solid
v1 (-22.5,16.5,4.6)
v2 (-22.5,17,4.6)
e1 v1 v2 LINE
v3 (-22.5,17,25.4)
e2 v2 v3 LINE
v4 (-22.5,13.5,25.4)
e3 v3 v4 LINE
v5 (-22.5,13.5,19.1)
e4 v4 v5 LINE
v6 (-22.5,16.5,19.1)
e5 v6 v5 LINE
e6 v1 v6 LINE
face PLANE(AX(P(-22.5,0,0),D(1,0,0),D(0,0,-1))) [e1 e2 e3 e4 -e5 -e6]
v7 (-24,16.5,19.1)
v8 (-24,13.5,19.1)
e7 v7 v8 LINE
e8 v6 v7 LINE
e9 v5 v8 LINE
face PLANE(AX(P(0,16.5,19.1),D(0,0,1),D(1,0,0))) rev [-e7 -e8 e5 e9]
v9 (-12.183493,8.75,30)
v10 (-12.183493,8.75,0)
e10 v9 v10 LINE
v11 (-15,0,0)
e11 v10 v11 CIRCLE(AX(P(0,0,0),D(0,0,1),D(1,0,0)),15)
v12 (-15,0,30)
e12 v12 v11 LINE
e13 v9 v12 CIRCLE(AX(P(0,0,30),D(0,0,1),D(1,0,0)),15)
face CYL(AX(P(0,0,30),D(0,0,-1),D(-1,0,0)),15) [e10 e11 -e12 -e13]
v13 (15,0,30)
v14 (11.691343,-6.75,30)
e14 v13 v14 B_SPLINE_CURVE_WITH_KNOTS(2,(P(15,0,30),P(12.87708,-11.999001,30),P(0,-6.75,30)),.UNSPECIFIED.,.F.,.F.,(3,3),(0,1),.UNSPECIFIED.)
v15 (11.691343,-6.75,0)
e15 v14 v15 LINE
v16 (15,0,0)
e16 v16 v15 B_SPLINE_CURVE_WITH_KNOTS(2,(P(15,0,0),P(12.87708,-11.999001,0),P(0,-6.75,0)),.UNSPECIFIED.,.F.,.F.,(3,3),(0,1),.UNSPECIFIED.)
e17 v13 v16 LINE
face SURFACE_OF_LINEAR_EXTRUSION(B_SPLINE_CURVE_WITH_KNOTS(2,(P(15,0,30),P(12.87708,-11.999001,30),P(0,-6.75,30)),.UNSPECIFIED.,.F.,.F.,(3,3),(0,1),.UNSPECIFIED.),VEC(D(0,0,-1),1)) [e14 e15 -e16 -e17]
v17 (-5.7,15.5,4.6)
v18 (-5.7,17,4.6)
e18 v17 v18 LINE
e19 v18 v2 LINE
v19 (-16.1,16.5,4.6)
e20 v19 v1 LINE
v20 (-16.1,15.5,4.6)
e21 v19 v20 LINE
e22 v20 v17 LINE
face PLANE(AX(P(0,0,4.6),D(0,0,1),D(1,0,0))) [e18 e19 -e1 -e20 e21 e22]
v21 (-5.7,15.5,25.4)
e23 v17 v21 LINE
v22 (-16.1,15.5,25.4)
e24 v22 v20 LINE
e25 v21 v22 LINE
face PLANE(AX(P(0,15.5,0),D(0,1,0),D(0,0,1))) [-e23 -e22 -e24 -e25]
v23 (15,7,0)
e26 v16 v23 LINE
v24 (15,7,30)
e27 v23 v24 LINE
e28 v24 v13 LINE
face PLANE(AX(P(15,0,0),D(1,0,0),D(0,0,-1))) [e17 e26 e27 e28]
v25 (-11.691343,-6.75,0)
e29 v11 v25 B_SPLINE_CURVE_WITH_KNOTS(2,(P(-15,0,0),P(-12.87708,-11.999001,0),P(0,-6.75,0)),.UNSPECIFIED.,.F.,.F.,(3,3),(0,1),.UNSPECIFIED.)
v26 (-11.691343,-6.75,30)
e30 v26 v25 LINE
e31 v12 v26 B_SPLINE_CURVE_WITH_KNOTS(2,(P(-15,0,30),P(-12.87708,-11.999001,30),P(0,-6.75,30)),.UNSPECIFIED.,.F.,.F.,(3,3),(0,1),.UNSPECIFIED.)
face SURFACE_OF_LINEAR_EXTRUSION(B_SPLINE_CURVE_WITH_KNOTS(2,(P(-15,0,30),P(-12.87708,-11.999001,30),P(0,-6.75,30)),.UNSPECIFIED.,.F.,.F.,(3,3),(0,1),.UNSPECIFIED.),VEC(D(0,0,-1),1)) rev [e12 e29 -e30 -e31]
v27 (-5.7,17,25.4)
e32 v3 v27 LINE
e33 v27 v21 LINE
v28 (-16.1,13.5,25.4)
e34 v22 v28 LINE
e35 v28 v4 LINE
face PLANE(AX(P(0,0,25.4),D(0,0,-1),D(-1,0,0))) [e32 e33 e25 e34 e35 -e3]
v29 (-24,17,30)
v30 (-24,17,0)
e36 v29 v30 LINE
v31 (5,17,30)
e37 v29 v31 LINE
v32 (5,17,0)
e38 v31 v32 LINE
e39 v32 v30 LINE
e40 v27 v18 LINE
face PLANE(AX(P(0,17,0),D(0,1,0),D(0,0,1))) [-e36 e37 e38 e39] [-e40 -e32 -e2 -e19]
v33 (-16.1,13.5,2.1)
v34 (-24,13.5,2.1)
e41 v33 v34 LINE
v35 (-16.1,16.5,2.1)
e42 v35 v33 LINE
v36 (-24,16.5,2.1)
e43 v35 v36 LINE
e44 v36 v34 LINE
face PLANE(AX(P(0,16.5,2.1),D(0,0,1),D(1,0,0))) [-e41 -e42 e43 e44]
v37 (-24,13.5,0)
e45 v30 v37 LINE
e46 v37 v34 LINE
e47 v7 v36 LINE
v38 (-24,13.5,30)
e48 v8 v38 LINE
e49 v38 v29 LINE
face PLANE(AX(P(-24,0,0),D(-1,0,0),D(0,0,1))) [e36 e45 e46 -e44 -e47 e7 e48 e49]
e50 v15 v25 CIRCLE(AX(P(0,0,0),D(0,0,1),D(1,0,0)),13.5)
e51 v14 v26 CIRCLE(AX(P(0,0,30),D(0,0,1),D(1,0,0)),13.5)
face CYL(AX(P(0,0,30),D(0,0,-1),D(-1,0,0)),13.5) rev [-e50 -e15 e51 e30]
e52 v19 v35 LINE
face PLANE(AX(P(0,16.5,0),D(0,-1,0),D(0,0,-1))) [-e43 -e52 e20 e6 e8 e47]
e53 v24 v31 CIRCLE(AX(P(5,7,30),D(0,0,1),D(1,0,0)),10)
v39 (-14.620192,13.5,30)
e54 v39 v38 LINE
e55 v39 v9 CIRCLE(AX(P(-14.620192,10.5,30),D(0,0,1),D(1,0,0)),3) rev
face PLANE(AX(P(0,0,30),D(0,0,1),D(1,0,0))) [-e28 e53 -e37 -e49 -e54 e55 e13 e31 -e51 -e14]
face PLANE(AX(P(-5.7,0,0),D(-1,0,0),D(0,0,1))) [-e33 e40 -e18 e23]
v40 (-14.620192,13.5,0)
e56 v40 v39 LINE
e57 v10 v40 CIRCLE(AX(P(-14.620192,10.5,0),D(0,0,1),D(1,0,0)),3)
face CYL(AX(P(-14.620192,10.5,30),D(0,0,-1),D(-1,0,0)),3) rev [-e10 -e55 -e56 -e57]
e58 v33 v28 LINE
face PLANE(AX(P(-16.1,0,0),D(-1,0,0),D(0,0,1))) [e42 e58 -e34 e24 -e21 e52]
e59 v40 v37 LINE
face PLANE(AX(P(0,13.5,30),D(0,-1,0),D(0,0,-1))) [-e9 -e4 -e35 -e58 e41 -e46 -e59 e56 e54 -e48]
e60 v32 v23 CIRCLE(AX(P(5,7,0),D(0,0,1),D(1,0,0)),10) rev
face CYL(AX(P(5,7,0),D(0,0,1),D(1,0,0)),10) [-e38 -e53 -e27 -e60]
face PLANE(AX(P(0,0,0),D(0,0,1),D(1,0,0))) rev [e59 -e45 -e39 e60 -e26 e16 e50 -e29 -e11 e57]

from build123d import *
from build123d.topology import SkipClean

# Parameters (mm, degrees)
SKETCH_2_W           = 5
SKETCH_2_H           = 5
EXTRUDE_3_DEPTH      = 30
CUT_EXTRUDE_10_DEPTH = 3
SKETCH_10_W          = 25.587445544
SKETCH_10_H          = 30
CUT_EXTRUDE_11_DEPTH = 1.5
SKETCH_11_W          = 16.6
SKETCH_11_H          = 21.6
SKETCH_11_W_2        = 16
SKETCH_11_H_2        = 21
CUT_EXTRUDE_13_DEPTH = 1.5
SKETCH_12_W          = 3.2
SKETCH_12_H          = 21.6
CUT_EXTRUDE_14_DEPTH = 2
FILLET_7_R           = 7
FILLET_8_R           = 3
SKETCH_13_W          = 4.016092165
SKETCH_13_H          = 18.031984282
CUT_EXTRUDE_15_DEPTH = 1.5
EXTRUDE_4_DEPTH      = 1.5
SKETCH_15_W          = 10
SKETCH_15_H          = 30
EXTRUDE_6_DEPTH      = 8
SKETCH_17_R          = 13.5
CUT_EXTRUDE_16_DEPTH = 40.862263024
SKETCH_19_W          = 16.6
SKETCH_19_H          = 0.2
EXTRUDE_7_DEPTH      = 3.5
SKETCH_20_W          = 30
SKETCH_20_H          = 17
EXTRUDE_8_DEPTH      = 5.211662
FILLET_18_R          = 10
SKETCH_21_R          = 13.5
CUT_EXTRUDE_17_DEPTH = 40.862263024
SKETCH_22_W          = 30
SKETCH_22_H          = 3.5
EXTRUDE_9_DEPTH      = 4
SKETCH_23_W          = 21.2
SKETCH_23_H          = 3.5
CUT_EXTRUDE_18_DEPTH = 4
EXTRUDE_START        = -3
SKETCH_24_R          = 1.1
EXTRUDE_10_DEPTH     = 3
SKETCH_25_W          = 21.2
SKETCH_25_H          = 1.5
EXTRUDE_11_DEPTH     = 4
SKETCH_27_W          = 16.6
SKETCH_27_H          = 3.5
EXTRUDE_12_DEPTH     = 0.5
SKETCH_28_W          = 16.6
SKETCH_28_H          = 3.5
EXTRUDE_13_DEPTH     = 0.5
SKETCH_29_W          = 20.2
SKETCH_29_H          = 2
EXTRUDE_14_DEPTH     = 1
CUT_EXTRUDE_19_DEPTH = 0.3
CUT_EXTRUDE_20_DEPTH = 0.3
SKETCH_32_W          = 20.8
SKETCH_32_H          = 3.5
CUT_EXTRUDE_21_DEPTH = 0.2
SKETCH_33_W          = 10.4
SKETCH_33_H          = 20.8
CUT_EXTRUDE_22_DEPTH = 1.5
SKETCH_34_W          = 0.328912479
SKETCH_34_H          = 2.5
SKETCH_34_W_2        = 6.071087521
CUT_EXTRUDE_24_DEPTH = 3


with BuildPart() as part:
    # 스케치2 → 보스-돌출3 (new body)
    with BuildSketch(Plane.XY):
        with Locations((-17.5, 16)):
            Rectangle(SKETCH_2_W, SKETCH_2_H)
        with BuildLine():
            Line((-6.659230275, 13.5), (-6.538348415, 13.5))
            ThreePointArc((-6.538348415, 13.5), (-3.354101966, 14.620191517), (0, 15))
            Line((0, 15), (0, 18.5))
            Line((0, 18.5), (-15, 18.5))
            Line((-15, 18.5), (-15, 13.5))
            Line((-15, 13.5), (-6.659230275, 13.5))
        make_face()
        with BuildLine():
            Line((0, 18.5), (0, 15))
            ThreePointArc((0, 15), (2.845384759, 14.72765377), (5.587445544, 13.920504743))
            Line((5.587445544, 13.920504743), (5.587445544, 18.5))
            Line((5.587445544, 18.5), (0, 18.5))
        make_face()
        with BuildLine():
            Line((0, 15), (0, 13.5))
            Line((0, 13.5), (5.587445544, 13.5))
            Line((5.587445544, 13.5), (5.587445544, 13.920504743))
            ThreePointArc((5.587445544, 13.920504743), (2.845384759, 14.72765377), (0, 15))
        make_face()
        with BuildLine():
            Line((-6.538348415, 13.5), (0, 13.5))
            Line((0, 13.5), (0, 15))
            ThreePointArc((0, 15), (-3.354101966, 14.620191517), (-6.538348415, 13.5))
        make_face()
        with BuildLine():
            ThreePointArc((-11.691342951, -6.75), (-11.691342951, 6.75), (0, 13.5))
            Line((0, 13.5), (-6.538348415, 13.5))
            ThreePointArc((-6.538348415, 13.5), (-12.709744809, 7.966328319), (-15, 0))
            add(Edge.make_bspline(
                [(-15, 0), (-14.169195888, -4.6958052), (-11.691342951, -6.75)],
                knots=[0, 0, 0, 0.391349689, 0.391349689, 0.391349689], degree=2))
        make_face()
        with BuildLine():
            Line((5.587445544, 13.920504743), (5.587445544, 13.5))
            Line((5.587445544, 13.5), (6.538348415, 13.5))
            ThreePointArc((6.538348415, 13.5), (6.066541506, 13.718493873), (5.587445544, 13.920504743))
        make_face()
        with BuildLine():
            Line((5.587445544, 13.5), (0, 13.5))
            ThreePointArc((0, 13.5), (9.545941546, 9.545941546), (13.5, 0))
            ThreePointArc((13.5, 0), (13.039998655, -3.494057109), (11.691342951, -6.75))
            add(Edge.make_bspline(
                [(15, 0), (14.169195888, -4.6958052), (11.691342951, -6.75)],
                knots=[0, 0, 0, 0.391349689, 0.391349689, 0.391349689], degree=2))
            ThreePointArc((15, 0), (12.709744809, 7.966328319), (6.538348415, 13.5))
            Line((6.538348415, 13.5), (5.587445544, 13.5))
        make_face()
    extrude(amount=EXTRUDE_3_DEPTH)

    # 스케치3 → 컷-돌출10 (cut)
    with BuildSketch(Plane(origin=(0, 18.5, 0), x_dir=(1, 0, 0), z_dir=(0, 1, 0))):
        with BuildLine():
            Line((-18, -4.5), (-18, -15))
            Line((-18, -15), (-18, -25.5))
            Line((-18, -25.5), (-5.67, -25.5))
            Line((-5.67, -25.5), (-5.67, -23.546313431))
            ThreePointArc((-5.67, -23.546313431), (-6.553883476, -21.412429955), (-4.42, -22.296313431))
            Line((-4.42, -22.296313431), (-2, -22.296313431))
            Line((-2, -22.296313431), (-2, -7.5))
            Line((-2, -7.5), (-4.42, -7.5))
            ThreePointArc((-4.42, -7.5), (-6.553883476, -8.383883476), (-5.67, -6.25))
            Line((-5.67, -6.25), (-5.67, -4.5))
            Line((-5.67, -4.5), (-18, -4.5))
        make_face()
        with BuildLine():
            Line((-2, -4.5), (-5.67, -4.5))
            Line((-5.67, -4.5), (-5.67, -6.25))
            ThreePointArc((-5.67, -6.25), (-4.786116524, -6.616116524), (-4.42, -7.5))
            Line((-4.42, -7.5), (-2, -7.5))
            Line((-2, -7.5), (-2, -4.5))
        make_face()
        with BuildLine():
            Line((-5.67, -23.546313431), (-5.67, -25.5))
            Line((-5.67, -25.5), (-2, -25.5))
            Line((-2, -25.5), (-2, -22.296313431))
            Line((-2, -22.296313431), (-4.42, -22.296313431))
            ThreePointArc((-4.42, -22.296313431), (-4.786116524, -23.180196907), (-5.67, -23.546313431))
        make_face()
    extrude(amount=-CUT_EXTRUDE_10_DEPTH, mode=Mode.SUBTRACT)

    # 스케치10 → 컷-돌출11 (cut)
    with BuildSketch(Plane(origin=(0, 18.5, 0), x_dir=(1, 0, 0), z_dir=(0, 1, 0))):
        with Locations((-7.206277228, -15)):
            Rectangle(SKETCH_10_W, SKETCH_10_H)
    extrude(amount=-CUT_EXTRUDE_11_DEPTH, mode=Mode.SUBTRACT)

    # 스케치11 → 컷-돌출13 (cut)
    with BuildSketch(Plane(origin=(0, 17, 0), x_dir=(1, 0, 0), z_dir=(0, 1, 0))):
        with Locations((-10, -15)):
            Rectangle(SKETCH_11_W, SKETCH_11_H)
        with Locations((-10, -15)):
            Rectangle(SKETCH_11_W_2, SKETCH_11_H_2, mode=Mode.SUBTRACT)
    extrude(amount=-CUT_EXTRUDE_13_DEPTH, mode=Mode.SUBTRACT)

    # 스케치12 → 컷-돌출14 (cut)
    with BuildSketch(Plane(origin=(0, 15.5, 0), x_dir=(1, 0, 0), z_dir=(0, 1, 0))):
        with Locations((-16.7, -15)):
            Rectangle(SKETCH_12_W, SKETCH_12_H)
    extrude(amount=-CUT_EXTRUDE_14_DEPTH, mode=Mode.SUBTRACT)

    # 필렛7
    # the kernel refuses this fillet: 7 mm, written as the material it takes off along each edge
    with BuildSketch(Plane(origin=(5.587445544, 17, -14.497767621), x_dir=(-1, 0, 0), z_dir=(0, 0, 1))) as fillet_7_piece_1:
        with BuildLine():
            CenterArc((5.799107049, 7), FILLET_7_R, 214.060784508, 55.939215492)
            Line((0, 3.079495257), (-0.115982141, 3.001085162))
            ThreePointArc((-0.115982141, 3.001085162), (-0.14, 1.539747629), (-0.14, 0))
            Line((-0.14, 0), (0, -0.14))
            Line((0, -0.14), (5.799107049, -0.14))
            Line((5.799107049, -0.14), (5.799107049, 0))
        make_face()
    extrude(amount=58.995535243, mode=Mode.SUBTRACT)

    # 필렛8
    fillet_8_edges = [part.edges().sort_by_distance(p)[0] for p in [
        (-6.538348415, 13.5, 15),
    ]]
    fillet(fillet_8_edges, radius=FILLET_8_R)

    # 스케치13 → 컷-돌출15 (cut)
    with BuildSketch(Plane(origin=(0, 17, 0), x_dir=(1, 0, 0), z_dir=(0, 1, 0))):
        with Locations((-5.720959824, -14.919139084)):
            Rectangle(SKETCH_13_W, SKETCH_13_H)
    extrude(amount=-CUT_EXTRUDE_15_DEPTH, mode=Mode.SUBTRACT)

    # 스케치14 → 보스-돌출4 (add)
    with BuildSketch(Plane(origin=(0, 15.5, 0), x_dir=(1, 0, 0), z_dir=(0, 1, 0))):
        with BuildLine():
            ThreePointArc((-3.1, -7.2), (-3.422182541, -6.422182541), (-4.2, -6.1))
            Line((-4.2, -6.1), (-4.2, -7.2))
            Line((-4.2, -7.2), (-3.1, -7.2))
        make_face()
        with BuildLine():
            Line((-4.2, -7.2), (-4.2, -6.1))
            ThreePointArc((-4.2, -6.1), (-4.977817459, -7.977817459), (-3.1, -7.2))
            Line((-3.1, -7.2), (-4.2, -7.2))
        make_face()
        with BuildLine():
            ThreePointArc((-3.1, -22.8), (-4.977817459, -22.022182541), (-4.2, -23.9))
            Line((-4.2, -23.9), (-4.2, -22.8))
            Line((-4.2, -22.8), (-3.1, -22.8))
        make_face()
        with BuildLine():
            Line((-4.2, -22.8), (-4.2, -23.9))
            ThreePointArc((-4.2, -23.9), (-3.422182541, -23.577817459), (-3.1, -22.8))
            Line((-3.1, -22.8), (-4.2, -22.8))
        make_face()
    extrude(amount=EXTRUDE_4_DEPTH)

    # 스케치15 → 보스-돌출6 (add)
    with BuildSketch(Plane(origin=(0, 17, 0), x_dir=(1, 0, 0), z_dir=(0, 1, 0))):
        with Locations((4.788338495, -15)):
            Rectangle(SKETCH_15_W, SKETCH_15_H)
    extrude(amount=-EXTRUDE_6_DEPTH)

    # 스케치17 → 컷-돌출16 (cut, through all)
    with BuildSketch(Plane(origin=(0, 0, 0), x_dir=(-1, 0, 0), z_dir=(0, 0, -1))):
        Circle(SKETCH_17_R)
    extrude(amount=-CUT_EXTRUDE_16_DEPTH, mode=Mode.SUBTRACT)

    # 스케치19 → 보스-돌출7 (add)
    with BuildSketch(Plane(origin=(0, 17, 0), x_dir=(1, 0, 0), z_dir=(0, 1, 0))):
        with Locations((-10, -4.3)):
            Rectangle(SKETCH_19_W, SKETCH_19_H)
        with Locations((-10, -25.7)):
            Rectangle(SKETCH_19_W, SKETCH_19_H)
    extrude(amount=-EXTRUDE_7_DEPTH)

    # 스케치20 → 보스-돌출8 (add)
    with BuildSketch(Plane(origin=(9.788338495, 0, 0), x_dir=(0, 0, -1), z_dir=(1, 0, 0))):
        with Locations((-15, 8.5)):
            Rectangle(SKETCH_20_W, SKETCH_20_H)
    extrude(amount=EXTRUDE_8_DEPTH)

    # 필렛18
    fillet_18_edges = [part.edges().sort_by_distance(p)[0] for p in [
        (15.000000495, 17, 15),
    ]]
    fillet(fillet_18_edges, radius=FILLET_18_R)

    # 스케치21 → 컷-돌출17 (cut, through all)
    with SkipClean():  # the faces are left unmerged after this step: merging them gives an invalid solid
        with BuildSketch(Plane.XY.offset(30)):
            Circle(SKETCH_21_R)
        extrude(amount=-CUT_EXTRUDE_17_DEPTH, mode=Mode.SUBTRACT)

    # 스케치22 → 보스-돌출9 (add)
    with SkipClean():  # the faces are left unmerged after this step: merging them gives an invalid solid
        with BuildSketch(Plane.ZY.offset(20)):
            with Locations((15, 15.25)):
                Rectangle(SKETCH_22_W, SKETCH_22_H)
        extrude(amount=EXTRUDE_9_DEPTH)

    # 스케치23 → 컷-돌출18 (cut)
    with SkipClean():  # the faces are left unmerged after this step: merging them gives an invalid solid
        with BuildSketch(Plane(origin=(-18.3, 0, 0), x_dir=(0, 0, -1), z_dir=(1, 0, 0))):
            with Locations((-15, 15.25)):
                Rectangle(SKETCH_23_W, SKETCH_23_H)
        extrude(amount=-CUT_EXTRUDE_18_DEPTH, mode=Mode.SUBTRACT)

    # 스케치24 → 보스-돌출10 (add)
    with SkipClean():  # the faces are left unmerged after this step: merging them gives an invalid solid
        with BuildSketch(Plane(origin=(0, 17, 0), x_dir=(1, 0, 0), z_dir=(0, 1, 0)).offset(EXTRUDE_START)):
            with Locations(Location((-4.2, -7.2, 0), (0, 0, 270))):
                Circle(SKETCH_24_R)
            with Locations(Location((-8.2, -7.2, 0), (0, 0, 270))):
                Circle(SKETCH_24_R)
            with Locations(Location((-8.2, -22.8, 0), (0, 0, 270))):
                Circle(SKETCH_24_R)
        extrude(amount=EXTRUDE_10_DEPTH)

    # 스케치25 → 보스-돌출11 (add)
    with SkipClean():  # the faces are left unmerged after this step: merging them gives an invalid solid
        with BuildSketch(Plane.ZY.offset(1.7)):
            with Locations((15, 16.25)):
                Rectangle(SKETCH_25_W, SKETCH_25_H)
        extrude(amount=EXTRUDE_11_DEPTH)

    # 스케치27 → 보스-돌출12 (add)
    with SkipClean():  # the faces are left unmerged after this step: merging them gives an invalid solid
        with BuildSketch(Plane.XY.offset(4.4)):
            with Locations((-14, 15.25)):
                Rectangle(SKETCH_27_W, SKETCH_27_H)
        extrude(amount=EXTRUDE_12_DEPTH)

    # 스케치28 → 보스-돌출13 (add)
    with SkipClean():  # the faces are left unmerged after this step: merging them gives an invalid solid
        with BuildSketch(Plane(origin=(0, 0, 25.6), x_dir=(-1, 0, 0), z_dir=(0, 0, -1))):
            with Locations((14, 15.25)):
                Rectangle(SKETCH_28_W, SKETCH_28_H)
        extrude(amount=EXTRUDE_13_DEPTH)

    # 스케치29 → 보스-돌출14 (add)
    with SkipClean():  # the faces are left unmerged after this step: merging them gives an invalid solid
        with BuildSketch(Plane.ZY.offset(15.1)):
            with Locations((15, 14.5)):
                Rectangle(SKETCH_29_W, SKETCH_29_H)
        extrude(amount=EXTRUDE_14_DEPTH)

    # 스케치30 → 컷-돌출19 (cut)
    with SkipClean():  # the faces are left unmerged after this step: merging them gives an invalid solid
        with BuildSketch(Plane(origin=(0, 0, 25.1), x_dir=(-1, 0, 0), z_dir=(0, 0, -1))):
            Polygon((5.7, 15.5), (16.1, 15.5), (16.1, 13.5), (22.3, 13.5), (22.3, 17), (5.7, 17), align=None)
        extrude(amount=-CUT_EXTRUDE_19_DEPTH, mode=Mode.SUBTRACT)

    # 스케치31 → 컷-돌출20 (cut)
    with SkipClean():  # the faces are left unmerged after this step: merging them gives an invalid solid
        with BuildSketch(Plane.XY.offset(4.9)):
            Polygon((-16.1, 13.5), (-16.1, 15.5), (-5.7, 15.5), (-5.7, 17), (-22.3, 17), (-22.3, 13.5), align=None)
        extrude(amount=-CUT_EXTRUDE_20_DEPTH, mode=Mode.SUBTRACT)

    # 스케치32 → 컷-돌출21 (cut)
    with SkipClean():  # the faces are left unmerged after this step: merging them gives an invalid solid
        with BuildSketch(Plane(origin=(-22.3, 0, 0), x_dir=(0, 0, -1), z_dir=(1, 0, 0))):
            with Locations((-15, 15.25)):
                Rectangle(SKETCH_32_W, SKETCH_32_H)
        extrude(amount=-CUT_EXTRUDE_21_DEPTH, mode=Mode.SUBTRACT)

    # 스케치33 → 컷-돌출22 (cut)
    with SkipClean():  # the faces are left unmerged after this step: merging them gives an invalid solid
        with BuildSketch(Plane(origin=(0, 17, 0), x_dir=(1, 0, 0), z_dir=(0, 1, 0))):
            with Locations((-10.9, -15)):
                Rectangle(SKETCH_33_W, SKETCH_33_H)
        extrude(amount=-CUT_EXTRUDE_22_DEPTH, mode=Mode.SUBTRACT)

    # 스케치34 → 컷-돌출24 (cut)
    with SkipClean():  # the faces are left unmerged after this step: merging them gives an invalid solid
        with BuildSketch(Plane.XZ.offset(-13.5)):
            with Locations((-16.264456239, 3.35)):
                Rectangle(SKETCH_34_W, SKETCH_34_H)
            with Locations((-19.46445624, 3.35)):
                Rectangle(SKETCH_34_W_2, SKETCH_34_H)
            Polygon((-22.5, 2.1), (-22.5, 4.6), (-22.5, 19.1), (-24, 19.1), (-24, 2.1), align=None)
        extrude(amount=-CUT_EXTRUDE_24_DEPTH, mode=Mode.SUBTRACT)


solid = part.part
